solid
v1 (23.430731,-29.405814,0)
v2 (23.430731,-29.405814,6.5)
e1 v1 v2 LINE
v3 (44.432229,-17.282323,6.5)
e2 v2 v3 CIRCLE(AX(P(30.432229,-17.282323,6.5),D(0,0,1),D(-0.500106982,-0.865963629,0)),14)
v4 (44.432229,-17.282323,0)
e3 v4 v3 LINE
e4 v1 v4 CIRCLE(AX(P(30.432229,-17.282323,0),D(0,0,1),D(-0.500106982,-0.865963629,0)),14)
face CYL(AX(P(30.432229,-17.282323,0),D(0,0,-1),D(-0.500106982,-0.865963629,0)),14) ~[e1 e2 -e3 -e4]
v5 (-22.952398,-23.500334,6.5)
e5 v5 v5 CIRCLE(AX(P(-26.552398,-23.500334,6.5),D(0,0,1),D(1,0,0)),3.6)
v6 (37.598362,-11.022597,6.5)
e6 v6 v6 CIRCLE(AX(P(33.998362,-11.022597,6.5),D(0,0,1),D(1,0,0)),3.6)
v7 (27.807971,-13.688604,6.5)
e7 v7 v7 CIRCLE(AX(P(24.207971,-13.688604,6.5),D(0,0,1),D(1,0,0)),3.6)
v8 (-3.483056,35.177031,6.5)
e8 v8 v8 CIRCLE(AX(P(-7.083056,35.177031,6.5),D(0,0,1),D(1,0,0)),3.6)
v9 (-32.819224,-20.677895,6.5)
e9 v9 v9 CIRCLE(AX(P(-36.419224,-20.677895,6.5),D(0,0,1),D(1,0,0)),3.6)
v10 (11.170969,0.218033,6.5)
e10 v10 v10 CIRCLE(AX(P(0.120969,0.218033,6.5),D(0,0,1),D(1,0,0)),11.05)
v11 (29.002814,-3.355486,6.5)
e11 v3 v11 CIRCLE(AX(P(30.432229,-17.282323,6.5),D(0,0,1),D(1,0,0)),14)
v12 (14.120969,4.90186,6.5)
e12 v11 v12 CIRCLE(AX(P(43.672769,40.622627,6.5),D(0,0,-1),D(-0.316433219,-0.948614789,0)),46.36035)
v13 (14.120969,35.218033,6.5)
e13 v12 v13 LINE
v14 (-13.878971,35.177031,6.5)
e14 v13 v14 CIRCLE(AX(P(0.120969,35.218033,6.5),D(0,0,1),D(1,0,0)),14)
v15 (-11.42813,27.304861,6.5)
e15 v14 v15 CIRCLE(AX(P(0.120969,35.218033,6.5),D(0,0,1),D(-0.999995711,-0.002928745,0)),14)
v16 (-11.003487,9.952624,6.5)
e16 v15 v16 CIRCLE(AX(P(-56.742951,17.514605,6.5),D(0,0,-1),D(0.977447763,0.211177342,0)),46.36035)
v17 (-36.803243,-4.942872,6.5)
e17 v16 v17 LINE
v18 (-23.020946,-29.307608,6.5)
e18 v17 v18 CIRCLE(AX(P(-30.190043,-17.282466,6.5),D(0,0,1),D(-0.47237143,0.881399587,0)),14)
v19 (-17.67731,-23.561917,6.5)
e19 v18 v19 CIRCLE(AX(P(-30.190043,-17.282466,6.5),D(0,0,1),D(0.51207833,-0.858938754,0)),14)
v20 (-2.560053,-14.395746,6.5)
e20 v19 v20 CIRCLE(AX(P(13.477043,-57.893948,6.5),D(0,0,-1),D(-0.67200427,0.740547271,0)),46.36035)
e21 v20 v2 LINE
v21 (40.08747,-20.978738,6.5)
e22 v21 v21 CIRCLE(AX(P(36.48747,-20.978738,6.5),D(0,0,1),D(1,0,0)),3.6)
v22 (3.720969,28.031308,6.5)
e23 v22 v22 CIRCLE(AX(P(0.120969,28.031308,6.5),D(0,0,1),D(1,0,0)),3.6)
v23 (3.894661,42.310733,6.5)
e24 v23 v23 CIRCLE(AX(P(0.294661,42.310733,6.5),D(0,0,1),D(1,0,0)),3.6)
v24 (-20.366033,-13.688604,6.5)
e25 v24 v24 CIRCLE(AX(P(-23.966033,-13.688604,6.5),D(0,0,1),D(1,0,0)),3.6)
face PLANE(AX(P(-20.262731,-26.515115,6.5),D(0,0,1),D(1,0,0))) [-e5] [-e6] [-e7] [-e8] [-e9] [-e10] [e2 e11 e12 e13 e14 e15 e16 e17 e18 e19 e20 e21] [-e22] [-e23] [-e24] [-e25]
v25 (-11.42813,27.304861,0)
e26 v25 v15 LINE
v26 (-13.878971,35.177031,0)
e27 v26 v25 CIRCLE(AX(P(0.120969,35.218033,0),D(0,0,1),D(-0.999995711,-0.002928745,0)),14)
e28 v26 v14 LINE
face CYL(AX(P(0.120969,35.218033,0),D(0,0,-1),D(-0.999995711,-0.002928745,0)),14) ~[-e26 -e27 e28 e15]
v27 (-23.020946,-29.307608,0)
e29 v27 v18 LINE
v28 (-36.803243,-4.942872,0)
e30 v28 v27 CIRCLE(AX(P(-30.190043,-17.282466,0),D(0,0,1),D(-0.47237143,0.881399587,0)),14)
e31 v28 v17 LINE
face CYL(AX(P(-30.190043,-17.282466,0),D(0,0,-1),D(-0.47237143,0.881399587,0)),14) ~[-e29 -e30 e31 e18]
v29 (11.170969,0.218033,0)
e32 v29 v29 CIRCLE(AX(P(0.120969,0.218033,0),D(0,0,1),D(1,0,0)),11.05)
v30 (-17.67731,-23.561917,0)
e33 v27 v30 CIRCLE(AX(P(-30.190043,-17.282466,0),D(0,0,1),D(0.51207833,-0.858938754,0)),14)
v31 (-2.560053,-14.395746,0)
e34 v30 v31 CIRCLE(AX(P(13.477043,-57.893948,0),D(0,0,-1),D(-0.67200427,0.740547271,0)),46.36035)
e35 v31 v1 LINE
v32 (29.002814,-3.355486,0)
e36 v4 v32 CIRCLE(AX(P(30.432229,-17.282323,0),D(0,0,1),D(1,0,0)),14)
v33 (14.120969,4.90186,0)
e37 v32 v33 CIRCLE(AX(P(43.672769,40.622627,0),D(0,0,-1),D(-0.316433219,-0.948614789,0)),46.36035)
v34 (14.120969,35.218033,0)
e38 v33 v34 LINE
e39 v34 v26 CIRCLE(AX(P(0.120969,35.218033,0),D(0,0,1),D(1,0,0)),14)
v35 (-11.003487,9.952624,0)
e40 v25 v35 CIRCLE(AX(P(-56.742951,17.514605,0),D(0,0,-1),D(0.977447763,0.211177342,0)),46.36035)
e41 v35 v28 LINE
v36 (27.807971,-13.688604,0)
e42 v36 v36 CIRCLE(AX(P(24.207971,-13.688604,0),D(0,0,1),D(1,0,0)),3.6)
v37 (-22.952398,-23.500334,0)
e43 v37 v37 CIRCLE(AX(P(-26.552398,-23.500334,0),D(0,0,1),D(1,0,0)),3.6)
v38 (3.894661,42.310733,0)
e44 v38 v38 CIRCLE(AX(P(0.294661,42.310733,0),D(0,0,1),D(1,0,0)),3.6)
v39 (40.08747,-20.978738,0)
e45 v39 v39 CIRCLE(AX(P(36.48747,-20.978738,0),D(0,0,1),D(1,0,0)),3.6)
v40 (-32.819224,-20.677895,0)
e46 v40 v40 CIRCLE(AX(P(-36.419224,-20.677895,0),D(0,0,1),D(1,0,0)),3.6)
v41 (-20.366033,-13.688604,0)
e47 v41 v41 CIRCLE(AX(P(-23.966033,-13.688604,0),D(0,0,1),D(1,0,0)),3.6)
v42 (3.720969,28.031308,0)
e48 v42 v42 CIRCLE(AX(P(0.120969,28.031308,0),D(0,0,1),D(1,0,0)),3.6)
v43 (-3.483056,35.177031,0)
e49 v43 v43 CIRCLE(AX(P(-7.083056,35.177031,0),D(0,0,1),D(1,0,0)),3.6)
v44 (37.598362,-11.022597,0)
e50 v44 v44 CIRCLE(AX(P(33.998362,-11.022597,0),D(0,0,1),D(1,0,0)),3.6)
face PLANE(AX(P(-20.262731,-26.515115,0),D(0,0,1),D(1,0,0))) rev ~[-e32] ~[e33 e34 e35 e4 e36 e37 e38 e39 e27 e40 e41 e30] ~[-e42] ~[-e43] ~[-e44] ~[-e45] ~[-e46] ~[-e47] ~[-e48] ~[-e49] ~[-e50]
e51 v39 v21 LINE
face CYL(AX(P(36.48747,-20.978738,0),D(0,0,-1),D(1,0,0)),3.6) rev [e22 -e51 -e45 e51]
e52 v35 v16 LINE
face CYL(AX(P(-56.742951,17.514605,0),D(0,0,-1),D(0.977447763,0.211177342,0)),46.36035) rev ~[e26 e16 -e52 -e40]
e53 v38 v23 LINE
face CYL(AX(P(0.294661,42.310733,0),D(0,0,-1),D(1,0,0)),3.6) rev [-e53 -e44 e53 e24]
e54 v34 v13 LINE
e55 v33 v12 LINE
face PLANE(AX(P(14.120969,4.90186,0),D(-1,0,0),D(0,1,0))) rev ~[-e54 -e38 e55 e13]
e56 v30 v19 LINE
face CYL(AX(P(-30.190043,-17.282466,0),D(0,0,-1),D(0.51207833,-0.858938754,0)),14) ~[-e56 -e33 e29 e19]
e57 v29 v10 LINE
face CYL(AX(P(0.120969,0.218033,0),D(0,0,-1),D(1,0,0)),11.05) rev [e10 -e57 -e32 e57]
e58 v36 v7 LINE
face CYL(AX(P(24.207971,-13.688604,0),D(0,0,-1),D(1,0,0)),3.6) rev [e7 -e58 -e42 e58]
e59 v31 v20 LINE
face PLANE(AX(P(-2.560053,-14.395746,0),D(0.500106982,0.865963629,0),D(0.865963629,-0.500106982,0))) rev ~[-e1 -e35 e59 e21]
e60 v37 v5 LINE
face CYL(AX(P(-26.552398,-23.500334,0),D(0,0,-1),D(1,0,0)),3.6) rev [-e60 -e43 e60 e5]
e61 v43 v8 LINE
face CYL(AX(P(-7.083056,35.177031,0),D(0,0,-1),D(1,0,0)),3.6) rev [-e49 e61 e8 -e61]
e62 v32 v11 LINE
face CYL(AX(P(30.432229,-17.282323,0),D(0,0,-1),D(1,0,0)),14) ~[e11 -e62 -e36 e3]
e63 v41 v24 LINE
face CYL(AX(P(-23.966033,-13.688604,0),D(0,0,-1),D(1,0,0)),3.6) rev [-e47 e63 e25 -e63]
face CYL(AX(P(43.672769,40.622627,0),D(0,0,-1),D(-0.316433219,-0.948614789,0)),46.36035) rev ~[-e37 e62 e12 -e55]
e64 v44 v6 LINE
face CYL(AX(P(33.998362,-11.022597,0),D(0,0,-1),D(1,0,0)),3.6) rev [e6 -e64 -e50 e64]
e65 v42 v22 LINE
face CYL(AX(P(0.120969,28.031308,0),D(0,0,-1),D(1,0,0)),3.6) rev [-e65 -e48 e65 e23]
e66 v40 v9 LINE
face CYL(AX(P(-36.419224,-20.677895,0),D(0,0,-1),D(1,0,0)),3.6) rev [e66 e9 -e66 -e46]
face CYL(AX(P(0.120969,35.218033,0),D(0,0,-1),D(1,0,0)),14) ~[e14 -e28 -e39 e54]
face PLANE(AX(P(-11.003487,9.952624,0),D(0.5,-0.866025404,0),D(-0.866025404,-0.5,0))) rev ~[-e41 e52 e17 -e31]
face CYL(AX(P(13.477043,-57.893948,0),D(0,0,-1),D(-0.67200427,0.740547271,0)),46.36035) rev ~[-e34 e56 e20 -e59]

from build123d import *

# Parameters (mm, degrees)
F0_R     = 3.6
F0_R_2   = 11.05
F1_DEPTH = 6.5


# Not quite as in the source:
# - a feature names something its author has since deleted; it is built from what else it names


with BuildPart() as f1:
    # F0 (on Top) → F1 (new body)
    with BuildSketch(Plane.XY):
        with BuildLine():
            ThreePointArc((-23.0209464524, -29.3076083822), (-19.9383676627, -26.8167802289), (-17.6773098575, -23.5619170235))
            ThreePointArc((-17.6773098575, -23.5619170235), (-20.4709038775, -26.3215082368), (-23.0209464524, -29.3076083822))
        make_face()
        with BuildLine():
            ThreePointArc((-2.5600533635, -14.3957456382), (-1.63787321, -14.0667717582), (-0.7089513801, -13.7573460272))
            ThreePointArc((-0.7089513801, -13.7573460272), (-3.7381834506, -13.2395644299), (-6.5814605839, -12.0733226612))
            Line((-6.5814605839, -12.0733226612), (-2.5600533635, -14.3957456382))
        make_face()
        with BuildLine():
            ThreePointArc((-0.7089513801, -13.7573460272), (3.2568779095, -13.4262355322), (6.9693155956, -11.9926238203))
            ThreePointArc((6.9693155956, -11.9926238203), (3.0926272048, -12.7115843783), (-0.7089513801, -13.7573460272))
        make_face()
        with BuildLine():
            ThreePointArc((29.002813969, -3.3554863963), (22.1605329653, -5.9872334975), (17.5863384821, -11.7160769207))
            ThreePointArc((17.5863384821, -11.7160769207), (17.1389450218, -21.6742013703), (23.4307313902, -29.4058136055))
            ThreePointArc((23.4307313902, -29.4058136055), (37.4314802249, -29.4071108103), (44.4322291397, -17.282322802))
            ThreePointArc((44.4322291397, -17.282322802), (39.8127458528, -6.8897337985), (29.002813969, -3.3554863963))
        make_face()
        with Locations((24.2079713773, -13.6886037443)):
            Circle(F0_R, mode=Mode.SUBTRACT)
        with Locations((36.4874702709, -20.9787380615)):
            Circle(F0_R, mode=Mode.SUBTRACT)
        with Locations((33.9983616409, -11.0225966846)):
            Circle(F0_R, mode=Mode.SUBTRACT)
        with BuildLine():
            ThreePointArc((-23.0209464524, -29.3076083822), (-20.4709038775, -26.3215082368), (-17.6773098575, -23.5619170235))
            ThreePointArc((-17.6773098575, -23.5619170235), (-16.5669328393, -20.5090534106), (-16.1900430763, -17.2824658218))
            ThreePointArc((-16.1900430763, -17.2824658218), (-16.8601676515, -13.0029306649), (-18.8063889562, -9.1330843193))
            ThreePointArc((-18.8063889562, -9.1330843193), (-27.0153338433, -3.6471725985), (-36.8032431016, -4.9428716054))
            ThreePointArc((-36.8032431016, -4.9428716054), (-42.3755818337, -24.1754075155), (-23.0209464524, -29.3076083822))
        make_face()
        with Locations((-26.552398323, -23.5003339555)):
            Circle(F0_R, mode=Mode.SUBTRACT)
        with Locations((-36.419223994, -20.6778945734)):
            Circle(F0_R, mode=Mode.SUBTRACT)
        with Locations((-23.9660330315, -13.6886037443)):
            Circle(F0_R, mode=Mode.SUBTRACT)
        with BuildLine():
            ThreePointArc((-11.3063452022, 8.3060793433), (-9.4777201208, 10.4094594589), (-7.2686697166, 12.1089222888))
            Line((-7.2686697166, 12.1089222888), (-11.0034872924, 9.9526243561))
            ThreePointArc((-11.0034872924, 9.9526243561), (-11.1474831305, 9.1279846364), (-11.3063452022, 8.3060793433))
        make_face()
        with BuildLine():
            ThreePointArc((-13.8745275017, -0.137033899), (-12.3890775486, 4.023274448), (-11.3063452022, 8.3060793433))
            ThreePointArc((-11.3063452022, 8.3060793433), (-13.2731105164, 4.292175001), (-13.8745275017, -0.137033899))
        make_face()
        with BuildLine():
            ThreePointArc((6.7990177159, 12.5226532313), (9.6860598983, 9.0919172063), (12.891022892, 5.9561279205))
            ThreePointArc((12.891022892, 5.9561279205), (10.3843499056, 9.7397463301), (6.7990177159, 12.5226532313))
        make_face()
        with BuildLine():
            ThreePointArc((12.891022892, 5.9561279205), (13.810029624, 3.1522495359), (14.1209691729, 0.2180334624))
            Line((14.1209691729, 0.2180334624), (14.1209691729, 4.9018602452))
            ThreePointArc((14.1209691729, 4.9018602452), (13.5013908187, 5.4236214762), (12.891022892, 5.9561279205))
        make_face()
        with BuildLine():
            ThreePointArc((-11.4281301493, 27.3048605939), (-12.4782019744, 31.2955370079), (-13.8789707842, 35.1770310271))
            ThreePointArc((-13.8789707842, 35.1770310271), (-13.2461965273, 31.0564374771), (-11.4281301493, 27.3048605939))
        make_face()
        with BuildLine():
            ThreePointArc((6.7990177159, 12.5226532313), (10.3843499056, 9.7397463301), (12.891022892, 5.9561279205))
            ThreePointArc((12.891022892, 5.9561279205), (13.5013908187, 5.4236214762), (14.1209691729, 4.9018602452))
            Line((14.1209691729, 4.9018602452), (14.1209691729, 35.2180334624))
            ThreePointArc((14.1209691729, 35.2180334624), (4.2629861628, 21.8447879604), (-11.4281301493, 27.3048605939))
            ThreePointArc((-11.4281301493, 27.3048605939), (-10.3964763758, 18.6487931257), (-11.0034872924, 9.9526243561))
            Line((-11.0034872924, 9.9526243561), (-7.2686697166, 12.1089222888))
            ThreePointArc((-7.2686697166, 12.1089222888), (-0.2905931292, 14.2119827431), (6.7990177159, 12.5226532313))
        make_face()
        with BuildLine():
            ThreePointArc((6.9693155956, -11.9926238203), (12.2014668844, -6.8573870227), (14.1209691729, 0.2180334624))
            ThreePointArc((14.1209691729, 0.2180334624), (13.810029624, 3.1522495359), (12.891022892, 5.9561279205))
            ThreePointArc((12.891022892, 5.9561279205), (9.6860598983, 9.0919172063), (6.7990177159, 12.5226532313))
            ThreePointArc((6.7990177159, 12.5226532313), (-0.2905931292, 14.2119827431), (-7.2686697166, 12.1089222888))
            ThreePointArc((-7.2686697166, 12.1089222888), (-9.4777201208, 10.4094594589), (-11.3063452022, 8.3060793433))
            ThreePointArc((-11.3063452022, 8.3060793433), (-12.3890775486, 4.023274448), (-13.8745275017, -0.137033899))
            ThreePointArc((-13.8745275017, -0.137033899), (-11.8255695306, -7.0812961649), (-6.5814605839, -12.0733226612))
            ThreePointArc((-6.5814605839, -12.0733226612), (-3.7381834506, -13.2395644299), (-0.7089513801, -13.7573460272))
            ThreePointArc((-0.7089513801, -13.7573460272), (3.0926272048, -12.7115843783), (6.9693155956, -11.9926238203))
        make_face()
        with Locations((0.1209691729, 0.2180334624)):
            Circle(F0_R_2, mode=Mode.SUBTRACT)
        with BuildLine():
            ThreePointArc((-13.8745275017, -0.137033899), (-13.2731105164, 4.292175001), (-11.3063452022, 8.3060793433))
            ThreePointArc((-11.3063452022, 8.3060793433), (-11.1474831305, 9.1279846364), (-11.0034872924, 9.9526243561))
            Line((-11.0034872924, 9.9526243561), (-36.8032431016, -4.9428716054))
            ThreePointArc((-36.8032431016, -4.9428716054), (-27.0153338433, -3.6471725985), (-18.8063889562, -9.1330843193))
            ThreePointArc((-18.8063889562, -9.1330843193), (-16.0908458514, -4.7719029024), (-13.8745275017, -0.137033899))
        make_face()
        with BuildLine():
            Line((-2.5600533635, -14.3957456382), (-6.5814605839, -12.0733226612))
            ThreePointArc((-6.5814605839, -12.0733226612), (-11.8255695306, -7.0812961649), (-13.8745275017, -0.137033899))
            ThreePointArc((-13.8745275017, -0.137033899), (-16.0908458514, -4.7719029024), (-18.8063889562, -9.1330843193))
            ThreePointArc((-18.8063889562, -9.1330843193), (-16.8601676515, -13.0029306649), (-16.1900430763, -17.2824658218))
            ThreePointArc((-16.1900430763, -17.2824658218), (-16.5669328393, -20.5090534106), (-17.6773098575, -23.5619170235))
            ThreePointArc((-17.6773098575, -23.5619170235), (-10.5596558993, -18.2515569705), (-2.5600533635, -14.3957456382))
        make_face()
        with BuildLine():
            ThreePointArc((17.5863384821, -11.7160769207), (12.2698816763, -11.5493167715), (6.9693155956, -11.9926238203))
            ThreePointArc((6.9693155956, -11.9926238203), (3.2568779095, -13.4262355322), (-0.7089513801, -13.7573460272))
            ThreePointArc((-0.7089513801, -13.7573460272), (-1.63787321, -14.0667717582), (-2.5600533635, -14.3957456382))
            Line((-2.5600533635, -14.3957456382), (23.4307313902, -29.4058136055))
            ThreePointArc((23.4307313902, -29.4058136055), (17.1389450218, -21.6742013703), (17.5863384821, -11.7160769207))
        make_face()
        with BuildLine():
            Line((14.1209691729, 4.9018602452), (14.1209691729, 0.2180334624))
            ThreePointArc((14.1209691729, 0.2180334624), (12.2014668844, -6.8573870227), (6.9693155956, -11.9926238203))
            ThreePointArc((6.9693155956, -11.9926238203), (12.2698816763, -11.5493167715), (17.5863384821, -11.7160769207))
            ThreePointArc((17.5863384821, -11.7160769207), (22.1605329653, -5.9872334975), (29.002813969, -3.3554863963))
            ThreePointArc((29.002813969, -3.3554863963), (21.1797290943, 0.0844326658), (14.1209691729, 4.9018602452))
        make_face()
        with BuildLine():
            ThreePointArc((-11.4281301493, 27.3048605939), (4.2629861628, 21.8447879604), (14.1209691729, 35.2180334624))
            ThreePointArc((14.1209691729, 35.2180334624), (0.1004679333, 49.2180184516), (-13.8789707842, 35.1770310271))
            ThreePointArc((-13.8789707842, 35.1770310271), (-12.4782019744, 31.2955370079), (-11.4281301493, 27.3048605939))
        make_face()
        with Locations((0.1209691729, 28.0313078757)):
            Circle(F0_R, mode=Mode.SUBTRACT)
        with Locations((-7.0830557993, 35.1770310271)):
            Circle(F0_R, mode=Mode.SUBTRACT)
        with Locations((0.2946612417, 42.3107330219)):
            Circle(F0_R, mode=Mode.SUBTRACT)
    extrude(amount=F1_DEPTH)


solid = f1.part
